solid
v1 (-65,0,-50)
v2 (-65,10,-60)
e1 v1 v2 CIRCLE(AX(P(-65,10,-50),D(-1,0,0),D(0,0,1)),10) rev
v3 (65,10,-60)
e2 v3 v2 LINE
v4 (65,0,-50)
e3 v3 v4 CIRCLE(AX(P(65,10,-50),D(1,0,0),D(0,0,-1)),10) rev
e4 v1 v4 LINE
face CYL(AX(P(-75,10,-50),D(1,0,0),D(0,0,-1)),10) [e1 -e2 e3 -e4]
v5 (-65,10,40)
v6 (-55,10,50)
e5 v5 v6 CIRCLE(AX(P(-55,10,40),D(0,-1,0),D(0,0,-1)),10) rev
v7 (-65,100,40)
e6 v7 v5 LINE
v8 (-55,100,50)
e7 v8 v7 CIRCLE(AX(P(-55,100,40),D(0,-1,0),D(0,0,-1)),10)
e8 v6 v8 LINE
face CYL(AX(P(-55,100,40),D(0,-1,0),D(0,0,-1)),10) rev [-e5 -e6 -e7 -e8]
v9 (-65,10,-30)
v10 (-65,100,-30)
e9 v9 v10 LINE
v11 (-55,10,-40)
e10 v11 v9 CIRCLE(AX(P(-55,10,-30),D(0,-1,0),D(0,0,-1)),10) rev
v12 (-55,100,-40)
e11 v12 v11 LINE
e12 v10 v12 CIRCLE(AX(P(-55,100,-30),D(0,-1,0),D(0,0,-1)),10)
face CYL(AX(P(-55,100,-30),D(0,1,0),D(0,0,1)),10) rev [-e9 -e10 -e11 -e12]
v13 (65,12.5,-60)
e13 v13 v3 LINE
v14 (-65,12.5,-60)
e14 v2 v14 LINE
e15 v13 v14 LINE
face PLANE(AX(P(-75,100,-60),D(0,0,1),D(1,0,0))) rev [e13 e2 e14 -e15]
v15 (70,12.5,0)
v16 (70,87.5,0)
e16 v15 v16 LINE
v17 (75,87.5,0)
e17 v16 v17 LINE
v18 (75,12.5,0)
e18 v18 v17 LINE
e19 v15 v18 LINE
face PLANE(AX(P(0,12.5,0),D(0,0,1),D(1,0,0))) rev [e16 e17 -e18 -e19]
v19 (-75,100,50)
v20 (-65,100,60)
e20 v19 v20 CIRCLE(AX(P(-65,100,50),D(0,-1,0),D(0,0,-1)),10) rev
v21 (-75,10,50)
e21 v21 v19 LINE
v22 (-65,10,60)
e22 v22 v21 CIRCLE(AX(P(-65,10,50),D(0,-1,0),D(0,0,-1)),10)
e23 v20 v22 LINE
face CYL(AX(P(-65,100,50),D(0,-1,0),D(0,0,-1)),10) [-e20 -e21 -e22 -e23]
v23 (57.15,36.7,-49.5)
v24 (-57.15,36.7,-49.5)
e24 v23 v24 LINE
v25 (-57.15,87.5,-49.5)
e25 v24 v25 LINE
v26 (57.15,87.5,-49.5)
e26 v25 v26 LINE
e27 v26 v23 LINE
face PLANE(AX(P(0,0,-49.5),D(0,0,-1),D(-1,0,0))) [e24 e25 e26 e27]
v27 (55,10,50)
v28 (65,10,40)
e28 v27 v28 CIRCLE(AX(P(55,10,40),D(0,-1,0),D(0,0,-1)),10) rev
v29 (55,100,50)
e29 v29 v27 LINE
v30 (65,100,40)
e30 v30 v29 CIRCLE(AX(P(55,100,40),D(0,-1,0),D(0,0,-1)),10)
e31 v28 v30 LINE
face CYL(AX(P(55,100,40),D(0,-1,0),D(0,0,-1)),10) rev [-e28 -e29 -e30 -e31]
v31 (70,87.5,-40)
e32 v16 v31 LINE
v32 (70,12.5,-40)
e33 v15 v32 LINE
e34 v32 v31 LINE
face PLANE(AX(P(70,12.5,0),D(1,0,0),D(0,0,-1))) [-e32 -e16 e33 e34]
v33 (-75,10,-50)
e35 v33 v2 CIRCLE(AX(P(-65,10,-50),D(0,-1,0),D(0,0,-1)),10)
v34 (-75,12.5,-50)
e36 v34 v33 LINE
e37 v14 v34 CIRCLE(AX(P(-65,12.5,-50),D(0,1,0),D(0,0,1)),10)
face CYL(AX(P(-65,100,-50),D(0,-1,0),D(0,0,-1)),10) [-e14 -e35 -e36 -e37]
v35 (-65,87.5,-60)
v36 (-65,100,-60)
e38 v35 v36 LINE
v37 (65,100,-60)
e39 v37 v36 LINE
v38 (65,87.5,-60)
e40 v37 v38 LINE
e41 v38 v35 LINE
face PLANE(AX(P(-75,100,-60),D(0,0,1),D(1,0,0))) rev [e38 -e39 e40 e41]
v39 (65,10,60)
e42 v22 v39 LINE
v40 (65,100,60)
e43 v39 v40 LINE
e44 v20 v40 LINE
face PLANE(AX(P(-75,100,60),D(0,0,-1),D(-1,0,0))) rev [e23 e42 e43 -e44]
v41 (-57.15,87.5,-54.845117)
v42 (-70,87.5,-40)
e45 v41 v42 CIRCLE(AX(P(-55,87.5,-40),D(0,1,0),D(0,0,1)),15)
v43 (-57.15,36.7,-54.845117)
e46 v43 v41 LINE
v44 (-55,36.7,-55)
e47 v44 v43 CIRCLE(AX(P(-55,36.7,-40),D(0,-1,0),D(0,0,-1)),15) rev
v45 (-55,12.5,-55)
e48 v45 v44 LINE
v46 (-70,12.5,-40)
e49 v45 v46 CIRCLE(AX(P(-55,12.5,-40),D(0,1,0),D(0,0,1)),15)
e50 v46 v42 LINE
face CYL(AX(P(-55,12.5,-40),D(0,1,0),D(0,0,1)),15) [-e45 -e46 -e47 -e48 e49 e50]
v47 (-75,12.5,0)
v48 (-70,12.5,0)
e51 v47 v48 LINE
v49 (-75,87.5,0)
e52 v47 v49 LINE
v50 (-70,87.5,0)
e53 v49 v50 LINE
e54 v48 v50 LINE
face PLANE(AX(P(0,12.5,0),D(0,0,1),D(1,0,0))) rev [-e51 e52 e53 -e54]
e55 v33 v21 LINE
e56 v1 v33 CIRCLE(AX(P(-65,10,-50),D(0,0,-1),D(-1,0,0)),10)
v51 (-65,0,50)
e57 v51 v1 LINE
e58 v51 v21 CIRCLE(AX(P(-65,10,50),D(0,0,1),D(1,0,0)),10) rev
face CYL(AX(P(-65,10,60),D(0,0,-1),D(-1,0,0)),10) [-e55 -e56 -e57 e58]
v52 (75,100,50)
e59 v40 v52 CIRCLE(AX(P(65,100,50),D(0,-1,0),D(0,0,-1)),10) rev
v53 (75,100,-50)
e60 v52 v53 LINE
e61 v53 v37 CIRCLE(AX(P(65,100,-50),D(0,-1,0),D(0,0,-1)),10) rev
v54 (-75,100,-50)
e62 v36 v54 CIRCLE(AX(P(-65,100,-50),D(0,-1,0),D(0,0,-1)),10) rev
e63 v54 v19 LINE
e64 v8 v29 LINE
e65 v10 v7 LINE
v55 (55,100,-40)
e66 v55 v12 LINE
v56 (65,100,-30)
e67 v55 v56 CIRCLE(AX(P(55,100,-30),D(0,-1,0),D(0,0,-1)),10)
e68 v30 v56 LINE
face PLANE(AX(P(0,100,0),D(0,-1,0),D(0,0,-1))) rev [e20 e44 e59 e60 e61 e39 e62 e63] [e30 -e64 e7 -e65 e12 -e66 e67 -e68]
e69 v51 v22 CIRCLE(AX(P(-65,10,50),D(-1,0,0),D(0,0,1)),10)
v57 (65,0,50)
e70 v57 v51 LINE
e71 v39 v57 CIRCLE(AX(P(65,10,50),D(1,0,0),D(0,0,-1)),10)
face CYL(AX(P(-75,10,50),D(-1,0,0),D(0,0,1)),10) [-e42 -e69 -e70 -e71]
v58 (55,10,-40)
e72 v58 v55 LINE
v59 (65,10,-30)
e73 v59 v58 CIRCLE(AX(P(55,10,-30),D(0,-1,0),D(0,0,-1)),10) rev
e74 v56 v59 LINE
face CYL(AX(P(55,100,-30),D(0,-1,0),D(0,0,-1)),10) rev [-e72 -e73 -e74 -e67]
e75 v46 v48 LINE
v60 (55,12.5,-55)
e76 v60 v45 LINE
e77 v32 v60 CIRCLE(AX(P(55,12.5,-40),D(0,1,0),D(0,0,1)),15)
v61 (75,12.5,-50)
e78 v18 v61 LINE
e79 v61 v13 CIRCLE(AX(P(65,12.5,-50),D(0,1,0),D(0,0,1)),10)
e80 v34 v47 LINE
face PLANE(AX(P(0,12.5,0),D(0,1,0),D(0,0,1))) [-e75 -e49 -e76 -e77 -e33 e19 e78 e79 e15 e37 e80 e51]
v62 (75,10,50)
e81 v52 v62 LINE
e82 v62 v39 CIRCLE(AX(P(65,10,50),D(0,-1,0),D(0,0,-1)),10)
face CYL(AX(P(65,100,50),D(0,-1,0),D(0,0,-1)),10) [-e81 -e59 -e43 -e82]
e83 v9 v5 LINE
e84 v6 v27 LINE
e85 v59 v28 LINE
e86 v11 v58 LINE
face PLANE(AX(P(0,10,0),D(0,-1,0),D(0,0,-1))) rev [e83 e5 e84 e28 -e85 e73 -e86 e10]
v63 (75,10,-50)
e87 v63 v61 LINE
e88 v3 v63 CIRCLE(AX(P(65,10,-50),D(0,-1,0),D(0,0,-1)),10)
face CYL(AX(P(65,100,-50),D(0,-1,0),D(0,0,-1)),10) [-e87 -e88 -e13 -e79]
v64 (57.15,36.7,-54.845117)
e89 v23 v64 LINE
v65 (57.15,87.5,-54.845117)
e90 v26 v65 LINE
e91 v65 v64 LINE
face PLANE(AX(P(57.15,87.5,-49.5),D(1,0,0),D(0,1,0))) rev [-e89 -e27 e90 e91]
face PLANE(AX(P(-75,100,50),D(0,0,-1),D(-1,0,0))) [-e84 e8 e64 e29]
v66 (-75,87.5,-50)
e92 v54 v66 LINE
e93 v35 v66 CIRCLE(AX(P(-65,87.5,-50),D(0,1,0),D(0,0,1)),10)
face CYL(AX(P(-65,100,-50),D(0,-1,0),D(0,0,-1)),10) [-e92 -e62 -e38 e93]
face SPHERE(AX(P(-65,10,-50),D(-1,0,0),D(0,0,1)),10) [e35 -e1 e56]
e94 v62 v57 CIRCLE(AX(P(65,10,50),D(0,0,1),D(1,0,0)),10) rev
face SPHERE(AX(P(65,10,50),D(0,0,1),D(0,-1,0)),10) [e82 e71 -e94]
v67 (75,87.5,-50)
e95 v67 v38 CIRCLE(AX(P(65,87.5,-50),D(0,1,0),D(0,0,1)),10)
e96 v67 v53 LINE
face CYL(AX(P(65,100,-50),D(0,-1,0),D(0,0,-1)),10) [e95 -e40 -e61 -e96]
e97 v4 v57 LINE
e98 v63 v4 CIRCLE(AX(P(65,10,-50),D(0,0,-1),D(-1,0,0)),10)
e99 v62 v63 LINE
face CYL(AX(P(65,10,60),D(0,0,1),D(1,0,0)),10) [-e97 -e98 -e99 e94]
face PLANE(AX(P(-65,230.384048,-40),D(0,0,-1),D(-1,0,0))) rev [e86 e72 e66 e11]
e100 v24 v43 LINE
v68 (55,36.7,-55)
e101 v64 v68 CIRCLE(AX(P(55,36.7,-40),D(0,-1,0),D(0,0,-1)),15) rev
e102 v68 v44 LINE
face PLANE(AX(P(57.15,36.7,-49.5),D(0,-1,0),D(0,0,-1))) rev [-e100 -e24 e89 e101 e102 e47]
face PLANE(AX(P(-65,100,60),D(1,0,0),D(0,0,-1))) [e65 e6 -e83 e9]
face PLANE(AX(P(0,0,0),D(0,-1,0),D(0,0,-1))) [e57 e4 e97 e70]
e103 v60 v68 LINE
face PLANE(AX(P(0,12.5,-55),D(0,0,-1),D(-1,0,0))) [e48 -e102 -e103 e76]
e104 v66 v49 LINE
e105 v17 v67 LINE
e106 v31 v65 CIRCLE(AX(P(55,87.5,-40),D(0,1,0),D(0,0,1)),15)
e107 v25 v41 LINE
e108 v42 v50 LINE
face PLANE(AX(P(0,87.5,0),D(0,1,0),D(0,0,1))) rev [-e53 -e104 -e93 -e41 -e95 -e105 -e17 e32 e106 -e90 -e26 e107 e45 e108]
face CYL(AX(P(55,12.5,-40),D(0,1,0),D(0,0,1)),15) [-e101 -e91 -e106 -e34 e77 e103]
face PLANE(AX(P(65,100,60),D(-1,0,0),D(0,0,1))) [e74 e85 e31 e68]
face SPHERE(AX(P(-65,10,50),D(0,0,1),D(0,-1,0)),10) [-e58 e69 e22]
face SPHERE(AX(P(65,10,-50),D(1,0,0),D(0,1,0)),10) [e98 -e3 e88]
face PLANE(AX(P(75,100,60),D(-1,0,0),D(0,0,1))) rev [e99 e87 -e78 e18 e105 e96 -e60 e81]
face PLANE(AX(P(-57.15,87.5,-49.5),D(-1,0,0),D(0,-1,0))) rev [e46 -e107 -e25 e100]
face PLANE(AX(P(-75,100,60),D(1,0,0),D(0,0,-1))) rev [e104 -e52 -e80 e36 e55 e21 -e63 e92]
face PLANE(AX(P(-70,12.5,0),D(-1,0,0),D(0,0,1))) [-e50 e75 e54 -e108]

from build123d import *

# Parameters (mm, degrees)
SKETCH1_W           = 150
SKETCH1_H           = 120
BOSS_EXTRUDE1_DEPTH = 100
FILLET1_R           = 10
SHELL1_START        = -65
SHELL1_OUTLINE_W    = 90
SHELL1_OUTLINE_H    = 100
SHELL1_DEPTH        = 130
FILLET2_R           = 10
CUT_EXTRUDE1_DEPTH  = 37.5
BOSS_EXTRUDE2_START = 90
BOSS_EXTRUDE2_DEPTH = 90
SKETCH3_W           = 114.3
SKETCH3_H           = 50.8
CUT_EXTRUDE2_DEPTH  = 5.5
FILLET3_R           = 10


# Read off the part's stored shape, not the designer's step: Shell1
with BuildPart() as part:
    # Sketch1 → Boss-Extrude1 (new body)
    with BuildSketch(Plane(origin=(0, 0, 0), x_dir=(1, 0, 0), z_dir=(0, 1, 0))):
        Rectangle(SKETCH1_W, SKETCH1_H)
    extrude(amount=BOSS_EXTRUDE1_DEPTH)

    # Fillet1
    fillet1_edges = [part.edges().sort_by_distance(p)[0] for p in [
        (0, 0, 60),
        (-75, 0, 0),
        (0, 0, -60),
        (75, 0, 0),
        (75, 50, 60),
        (-75, 50, 60),
        (-75, 50, -60),
        (75, 50, -60),
    ]]
    fillet(fillet1_edges, radius=FILLET1_R)

    # Shell1 outline → Shell1 (cut)
    with BuildSketch(Plane.YZ.offset(SHELL1_START)):
        with Locations((55, 0)):
            Rectangle(SHELL1_OUTLINE_W, SHELL1_OUTLINE_H)
    extrude(amount=SHELL1_DEPTH, mode=Mode.SUBTRACT)

    # Fillet2
    fillet2_edges = [part.edges().sort_by_distance(p)[0] for p in [
        (65, 55, -50),
        (-65, 55, -50),
        (-65, 55, 50),
        (65, 55, 50),
    ]]
    fillet(fillet2_edges, radius=FILLET2_R)

    # Sketch2 → Cut-Extrude1 (cut, symmetric)
    with BuildSketch(Plane(origin=(0, 50, 0), x_dir=(1, 0, 0), z_dir=(0, 1, 0))):
        with BuildLine():
            Line((-75, 50), (-75, 0))
            Line((-75, 0), (-70, 0))
            Line((-70, 0), (-70, 40))
            ThreePointArc((-70, 40), (-65.606601718, 50.606601718), (-55, 55))
            Line((-55, 55), (55, 55))
            ThreePointArc((55, 55), (65.606601718, 50.606601718), (70, 40))
            Line((70, 40), (70, 0))
            Line((70, 0), (75, 0))
            Line((75, 0), (75, 50))
            ThreePointArc((75, 50), (72.071067812, 57.071067812), (65, 60))
            Line((65, 60), (-65, 60))
            ThreePointArc((-65, 60), (-72.071067812, 57.071067812), (-75, 50))
        make_face()
    extrude(amount=CUT_EXTRUDE1_DEPTH, both=True, mode=Mode.SUBTRACT)

    # Sketch4 → Boss-Extrude2 (add)
    with BuildSketch(Plane(origin=(0, 10, 0), x_dir=(1, 0, 0), z_dir=(0, 1, 0)).offset(BOSS_EXTRUDE2_START)):
        with BuildLine():
            Line((-65, 40), (65, 40))
            ThreePointArc((65, 40), (62.071067812, 47.071067812), (55, 50))
            Line((55, 50), (-55, 50))
            ThreePointArc((-55, 50), (-62.071067812, 47.071067812), (-65, 40))
        make_face()
    extrude(amount=-BOSS_EXTRUDE2_DEPTH)

    # Sketch3 → Cut-Extrude2 (cut, symmetric)
    with BuildSketch(Plane(origin=(0, 0, -55), x_dir=(-1, 0, 0), z_dir=(0, 0, -1))):
        with Locations((0, 62.1)):
            Rectangle(SKETCH3_W, SKETCH3_H)
    extrude(amount=CUT_EXTRUDE2_DEPTH, both=True, mode=Mode.SUBTRACT)

    # Fillet3
    fillet3_edges = [part.edges().sort_by_distance(p)[0] for p in [
        (-65, 55, -40),
        (65, 55, -40),
    ]]
    fillet(fillet3_edges, radius=FILLET3_R)


solid = part.part
